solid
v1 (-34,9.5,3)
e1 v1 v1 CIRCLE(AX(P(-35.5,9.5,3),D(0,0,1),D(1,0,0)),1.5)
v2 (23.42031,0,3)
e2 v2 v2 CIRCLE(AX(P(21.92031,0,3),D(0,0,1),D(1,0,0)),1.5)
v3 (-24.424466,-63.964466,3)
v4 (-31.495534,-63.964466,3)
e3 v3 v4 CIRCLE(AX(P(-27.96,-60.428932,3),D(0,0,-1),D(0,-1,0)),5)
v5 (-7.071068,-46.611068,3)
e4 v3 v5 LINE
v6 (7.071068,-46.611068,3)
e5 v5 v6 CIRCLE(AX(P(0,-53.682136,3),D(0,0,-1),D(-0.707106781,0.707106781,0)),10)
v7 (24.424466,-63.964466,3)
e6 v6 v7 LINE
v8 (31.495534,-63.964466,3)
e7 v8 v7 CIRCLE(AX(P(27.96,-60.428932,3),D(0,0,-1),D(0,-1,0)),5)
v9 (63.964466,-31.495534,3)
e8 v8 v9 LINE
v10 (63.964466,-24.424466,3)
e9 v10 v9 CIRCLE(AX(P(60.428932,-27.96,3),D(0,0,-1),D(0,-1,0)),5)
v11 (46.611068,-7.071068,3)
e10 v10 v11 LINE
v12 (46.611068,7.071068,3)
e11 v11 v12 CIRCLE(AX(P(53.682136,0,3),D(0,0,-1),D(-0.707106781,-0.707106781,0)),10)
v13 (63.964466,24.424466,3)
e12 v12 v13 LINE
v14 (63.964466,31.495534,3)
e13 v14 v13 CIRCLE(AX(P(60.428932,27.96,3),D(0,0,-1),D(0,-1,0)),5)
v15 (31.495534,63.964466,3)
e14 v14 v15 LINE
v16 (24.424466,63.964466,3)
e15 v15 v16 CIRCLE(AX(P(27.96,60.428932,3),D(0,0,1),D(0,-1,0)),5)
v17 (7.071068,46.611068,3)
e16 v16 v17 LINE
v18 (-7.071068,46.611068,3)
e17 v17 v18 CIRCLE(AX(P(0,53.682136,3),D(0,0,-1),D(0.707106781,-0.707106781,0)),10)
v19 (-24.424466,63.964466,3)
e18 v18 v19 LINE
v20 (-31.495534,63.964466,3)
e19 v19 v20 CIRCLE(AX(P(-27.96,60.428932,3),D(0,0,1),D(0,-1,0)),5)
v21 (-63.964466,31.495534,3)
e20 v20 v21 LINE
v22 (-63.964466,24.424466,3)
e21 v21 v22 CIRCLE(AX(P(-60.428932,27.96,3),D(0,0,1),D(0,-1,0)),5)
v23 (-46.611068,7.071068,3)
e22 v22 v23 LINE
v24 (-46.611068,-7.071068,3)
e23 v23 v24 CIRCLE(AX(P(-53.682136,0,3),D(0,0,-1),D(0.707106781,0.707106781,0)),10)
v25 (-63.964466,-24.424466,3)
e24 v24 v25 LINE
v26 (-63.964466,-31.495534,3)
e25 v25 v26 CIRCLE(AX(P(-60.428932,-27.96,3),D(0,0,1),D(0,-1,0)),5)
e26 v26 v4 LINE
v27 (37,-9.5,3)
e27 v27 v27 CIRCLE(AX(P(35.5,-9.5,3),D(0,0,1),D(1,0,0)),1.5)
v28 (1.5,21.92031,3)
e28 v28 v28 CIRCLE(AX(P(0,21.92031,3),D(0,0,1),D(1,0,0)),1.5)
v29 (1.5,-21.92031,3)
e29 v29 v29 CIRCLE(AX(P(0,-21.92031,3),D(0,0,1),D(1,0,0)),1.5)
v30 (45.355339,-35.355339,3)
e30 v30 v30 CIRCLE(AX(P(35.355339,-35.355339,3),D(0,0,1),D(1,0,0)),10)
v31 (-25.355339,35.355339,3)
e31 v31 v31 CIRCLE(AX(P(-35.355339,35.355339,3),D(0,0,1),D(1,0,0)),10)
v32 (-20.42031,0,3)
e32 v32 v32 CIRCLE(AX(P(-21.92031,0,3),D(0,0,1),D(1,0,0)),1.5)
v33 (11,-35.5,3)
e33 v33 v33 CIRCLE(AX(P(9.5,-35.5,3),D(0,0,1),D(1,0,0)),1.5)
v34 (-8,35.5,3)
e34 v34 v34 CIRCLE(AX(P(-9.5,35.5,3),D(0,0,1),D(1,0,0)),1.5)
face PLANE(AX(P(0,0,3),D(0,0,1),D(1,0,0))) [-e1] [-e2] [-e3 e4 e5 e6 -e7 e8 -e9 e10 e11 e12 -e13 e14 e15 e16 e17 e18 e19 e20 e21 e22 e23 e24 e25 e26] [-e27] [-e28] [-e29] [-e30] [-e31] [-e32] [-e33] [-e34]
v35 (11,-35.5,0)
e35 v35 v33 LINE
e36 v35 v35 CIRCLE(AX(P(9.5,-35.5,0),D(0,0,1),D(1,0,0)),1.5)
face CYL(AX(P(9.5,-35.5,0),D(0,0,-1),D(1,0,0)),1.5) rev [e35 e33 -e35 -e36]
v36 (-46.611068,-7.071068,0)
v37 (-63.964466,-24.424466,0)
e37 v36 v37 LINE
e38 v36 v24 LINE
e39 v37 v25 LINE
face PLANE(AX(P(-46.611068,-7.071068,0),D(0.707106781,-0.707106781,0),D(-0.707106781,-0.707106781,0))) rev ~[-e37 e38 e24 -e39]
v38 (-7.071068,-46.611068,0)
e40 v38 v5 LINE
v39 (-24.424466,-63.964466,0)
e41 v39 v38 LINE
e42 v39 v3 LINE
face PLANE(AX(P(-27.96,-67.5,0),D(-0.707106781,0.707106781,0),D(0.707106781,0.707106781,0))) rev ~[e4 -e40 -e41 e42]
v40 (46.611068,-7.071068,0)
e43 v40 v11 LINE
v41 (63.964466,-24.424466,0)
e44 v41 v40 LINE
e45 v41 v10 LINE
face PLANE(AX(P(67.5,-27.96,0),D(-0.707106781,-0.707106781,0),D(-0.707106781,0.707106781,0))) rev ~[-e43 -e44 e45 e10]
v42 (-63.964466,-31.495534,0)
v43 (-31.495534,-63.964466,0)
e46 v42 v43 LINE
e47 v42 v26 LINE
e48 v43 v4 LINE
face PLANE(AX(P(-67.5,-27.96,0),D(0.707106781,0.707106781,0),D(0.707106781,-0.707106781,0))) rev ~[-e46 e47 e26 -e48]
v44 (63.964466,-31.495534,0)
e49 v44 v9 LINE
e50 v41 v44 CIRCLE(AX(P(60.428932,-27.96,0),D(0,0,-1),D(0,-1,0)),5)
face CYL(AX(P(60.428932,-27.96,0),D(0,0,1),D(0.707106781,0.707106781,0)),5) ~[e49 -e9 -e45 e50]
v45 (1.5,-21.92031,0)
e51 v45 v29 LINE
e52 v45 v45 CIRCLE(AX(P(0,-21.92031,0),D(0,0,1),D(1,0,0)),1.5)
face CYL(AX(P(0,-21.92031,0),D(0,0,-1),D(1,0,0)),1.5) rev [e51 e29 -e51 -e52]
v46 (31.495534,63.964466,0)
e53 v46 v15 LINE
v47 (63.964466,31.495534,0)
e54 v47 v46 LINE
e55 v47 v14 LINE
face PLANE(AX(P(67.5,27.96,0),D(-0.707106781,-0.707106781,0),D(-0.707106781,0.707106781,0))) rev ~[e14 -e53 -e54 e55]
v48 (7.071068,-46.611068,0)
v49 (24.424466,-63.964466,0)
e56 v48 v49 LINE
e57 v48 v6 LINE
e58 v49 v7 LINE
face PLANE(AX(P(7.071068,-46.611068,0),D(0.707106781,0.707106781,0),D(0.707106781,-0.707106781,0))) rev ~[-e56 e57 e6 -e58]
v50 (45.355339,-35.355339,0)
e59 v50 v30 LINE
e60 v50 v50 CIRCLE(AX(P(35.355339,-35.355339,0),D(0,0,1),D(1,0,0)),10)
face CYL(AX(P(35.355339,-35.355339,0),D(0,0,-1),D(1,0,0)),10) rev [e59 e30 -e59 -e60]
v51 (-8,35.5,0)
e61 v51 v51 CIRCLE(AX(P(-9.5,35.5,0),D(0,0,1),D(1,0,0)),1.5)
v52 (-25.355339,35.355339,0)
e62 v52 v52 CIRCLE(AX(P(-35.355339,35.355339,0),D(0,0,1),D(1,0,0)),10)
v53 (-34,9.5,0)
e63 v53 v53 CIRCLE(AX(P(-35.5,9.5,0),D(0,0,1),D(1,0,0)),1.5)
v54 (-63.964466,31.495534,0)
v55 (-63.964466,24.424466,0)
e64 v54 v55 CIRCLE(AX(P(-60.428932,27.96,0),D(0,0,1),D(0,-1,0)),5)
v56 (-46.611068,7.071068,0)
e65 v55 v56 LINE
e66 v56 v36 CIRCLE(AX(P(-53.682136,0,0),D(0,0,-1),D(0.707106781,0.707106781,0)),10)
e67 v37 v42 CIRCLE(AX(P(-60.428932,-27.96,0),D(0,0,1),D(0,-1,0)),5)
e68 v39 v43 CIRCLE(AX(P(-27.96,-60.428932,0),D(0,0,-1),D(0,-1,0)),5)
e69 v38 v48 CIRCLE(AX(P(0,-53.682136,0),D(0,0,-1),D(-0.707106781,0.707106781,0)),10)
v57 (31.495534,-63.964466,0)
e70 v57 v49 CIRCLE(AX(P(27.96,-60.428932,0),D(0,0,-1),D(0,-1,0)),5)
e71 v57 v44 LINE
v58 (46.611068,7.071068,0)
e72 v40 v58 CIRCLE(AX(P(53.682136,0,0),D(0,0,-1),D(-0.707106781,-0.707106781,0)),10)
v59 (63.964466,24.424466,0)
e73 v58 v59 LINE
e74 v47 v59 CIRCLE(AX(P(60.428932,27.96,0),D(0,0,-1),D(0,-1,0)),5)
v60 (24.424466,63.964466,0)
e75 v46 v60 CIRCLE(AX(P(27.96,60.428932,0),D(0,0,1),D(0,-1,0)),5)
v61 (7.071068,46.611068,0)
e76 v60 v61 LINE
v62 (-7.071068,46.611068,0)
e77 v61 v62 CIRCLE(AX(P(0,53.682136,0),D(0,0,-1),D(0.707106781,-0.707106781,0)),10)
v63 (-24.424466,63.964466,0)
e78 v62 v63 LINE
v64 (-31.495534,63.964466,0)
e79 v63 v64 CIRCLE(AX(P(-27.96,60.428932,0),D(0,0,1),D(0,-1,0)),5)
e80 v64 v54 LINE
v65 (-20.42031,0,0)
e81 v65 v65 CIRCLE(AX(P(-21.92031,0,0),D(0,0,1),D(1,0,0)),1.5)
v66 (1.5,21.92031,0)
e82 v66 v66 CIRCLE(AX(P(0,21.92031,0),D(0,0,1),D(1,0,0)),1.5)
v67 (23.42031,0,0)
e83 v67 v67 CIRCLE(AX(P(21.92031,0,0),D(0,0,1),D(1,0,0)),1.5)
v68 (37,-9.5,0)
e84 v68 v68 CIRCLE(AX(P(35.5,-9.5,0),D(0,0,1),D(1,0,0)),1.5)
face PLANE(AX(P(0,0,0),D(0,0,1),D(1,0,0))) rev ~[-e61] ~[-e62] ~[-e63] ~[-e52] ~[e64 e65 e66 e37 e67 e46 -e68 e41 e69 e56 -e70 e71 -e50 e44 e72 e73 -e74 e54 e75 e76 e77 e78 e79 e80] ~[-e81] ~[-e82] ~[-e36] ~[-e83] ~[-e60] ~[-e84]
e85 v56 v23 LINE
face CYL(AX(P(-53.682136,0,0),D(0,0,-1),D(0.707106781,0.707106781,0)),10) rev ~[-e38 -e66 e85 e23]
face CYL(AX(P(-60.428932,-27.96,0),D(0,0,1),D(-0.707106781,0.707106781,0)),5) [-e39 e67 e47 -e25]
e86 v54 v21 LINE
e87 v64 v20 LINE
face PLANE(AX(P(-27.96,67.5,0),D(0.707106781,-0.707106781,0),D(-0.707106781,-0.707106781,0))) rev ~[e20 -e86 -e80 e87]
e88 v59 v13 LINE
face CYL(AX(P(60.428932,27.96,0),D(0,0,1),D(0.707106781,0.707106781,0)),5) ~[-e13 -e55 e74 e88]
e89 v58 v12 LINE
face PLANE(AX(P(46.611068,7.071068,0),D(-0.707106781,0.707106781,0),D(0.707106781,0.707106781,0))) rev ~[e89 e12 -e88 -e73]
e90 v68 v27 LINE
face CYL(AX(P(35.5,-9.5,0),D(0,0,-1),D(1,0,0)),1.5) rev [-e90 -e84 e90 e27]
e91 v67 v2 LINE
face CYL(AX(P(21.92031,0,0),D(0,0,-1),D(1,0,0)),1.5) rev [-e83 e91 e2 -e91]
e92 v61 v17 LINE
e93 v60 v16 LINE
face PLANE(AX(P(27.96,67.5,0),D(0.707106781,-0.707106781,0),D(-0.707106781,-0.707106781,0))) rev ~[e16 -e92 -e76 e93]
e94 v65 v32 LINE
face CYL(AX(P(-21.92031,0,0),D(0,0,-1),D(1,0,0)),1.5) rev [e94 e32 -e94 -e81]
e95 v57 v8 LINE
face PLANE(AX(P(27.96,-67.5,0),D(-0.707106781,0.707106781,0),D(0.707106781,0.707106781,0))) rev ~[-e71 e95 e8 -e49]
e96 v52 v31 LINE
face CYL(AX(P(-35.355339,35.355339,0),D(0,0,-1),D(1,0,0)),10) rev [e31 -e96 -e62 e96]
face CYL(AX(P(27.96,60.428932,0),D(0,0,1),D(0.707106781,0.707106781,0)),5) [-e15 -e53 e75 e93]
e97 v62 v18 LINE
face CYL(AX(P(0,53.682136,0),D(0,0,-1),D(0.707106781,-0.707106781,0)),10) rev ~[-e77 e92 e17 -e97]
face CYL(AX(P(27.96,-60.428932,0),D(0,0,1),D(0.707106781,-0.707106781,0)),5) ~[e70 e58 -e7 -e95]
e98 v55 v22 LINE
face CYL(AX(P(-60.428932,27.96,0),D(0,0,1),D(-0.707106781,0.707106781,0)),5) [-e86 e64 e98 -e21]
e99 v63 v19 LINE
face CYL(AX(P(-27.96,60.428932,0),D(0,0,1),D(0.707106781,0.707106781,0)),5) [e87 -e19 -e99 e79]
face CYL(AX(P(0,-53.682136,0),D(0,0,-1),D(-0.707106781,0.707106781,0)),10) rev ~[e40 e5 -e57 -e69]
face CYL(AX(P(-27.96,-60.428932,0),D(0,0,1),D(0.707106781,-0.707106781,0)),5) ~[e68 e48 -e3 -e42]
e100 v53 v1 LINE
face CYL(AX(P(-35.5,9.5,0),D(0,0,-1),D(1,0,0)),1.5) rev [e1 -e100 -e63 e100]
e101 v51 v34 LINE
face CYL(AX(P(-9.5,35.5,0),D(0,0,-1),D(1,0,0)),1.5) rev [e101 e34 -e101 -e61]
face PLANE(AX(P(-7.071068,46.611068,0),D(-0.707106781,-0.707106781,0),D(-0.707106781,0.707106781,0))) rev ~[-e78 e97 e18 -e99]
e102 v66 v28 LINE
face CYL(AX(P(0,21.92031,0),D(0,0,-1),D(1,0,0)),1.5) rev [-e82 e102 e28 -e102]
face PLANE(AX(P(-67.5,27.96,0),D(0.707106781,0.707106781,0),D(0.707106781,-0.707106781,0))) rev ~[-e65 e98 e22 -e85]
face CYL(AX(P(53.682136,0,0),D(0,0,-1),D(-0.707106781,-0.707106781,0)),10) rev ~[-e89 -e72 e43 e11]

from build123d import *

# Parameters (mm, degrees)
F0_R     = 1.5
F0_R_2   = 10
F1_DEPTH = 3
F2_R     = 5


with BuildPart() as f1:
    # F0 (on Top) → F1 (new body)
    with BuildSketch(Plane.XY):
        with BuildLine():
            Line((67.5, 27.96), (27.96, 67.5))
            Line((27.96, 67.5), (7.0710678119, 46.6110678119))
            ThreePointArc((7.0710678119, 46.6110678119), (0, 43.6821356237), (-7.0710678119, 46.6110678119))
            Line((-7.0710678119, 46.6110678119), (-27.96, 67.5))
            Line((-27.96, 67.5), (-67.5, 27.96))
            Line((-67.5, 27.96), (-46.6110678119, 7.0710678119))
            ThreePointArc((-46.6110678119, 7.0710678119), (-43.6821356237, 0), (-46.6110678119, -7.0710678119))
            Line((-46.6110678119, -7.0710678119), (-67.5, -27.96))
            Line((-67.5, -27.96), (-27.96, -67.5))
            Line((-27.96, -67.5), (-7.0710678119, -46.6110678119))
            ThreePointArc((-7.0710678119, -46.6110678119), (0, -43.6821356237), (7.0710678119, -46.6110678119))
            Line((7.0710678119, -46.6110678119), (27.96, -67.5))
            Line((27.96, -67.5), (67.5, -27.96))
            Line((67.5, -27.96), (46.6110678119, -7.0710678119))
            ThreePointArc((46.6110678119, -7.0710678119), (43.6821356237, 0), (46.6110678119, 7.0710678119))
            Line((46.6110678119, 7.0710678119), (67.5, 27.96))
        make_face()
        with Locations((9.5, -35.5)):
            Circle(F0_R, mode=Mode.SUBTRACT)
        with Locations((35.3553390593, -35.3553390593)):
            Circle(F0_R_2, mode=Mode.SUBTRACT)
        with Locations((0, -21.9203102168)):
            Circle(F0_R, mode=Mode.SUBTRACT)
        with Locations((35.5, -9.5)):
            Circle(F0_R, mode=Mode.SUBTRACT)
        with Locations((-35.5, 9.5)):
            Circle(F0_R, mode=Mode.SUBTRACT)
        with Locations((-21.9203102168, 0)):
            Circle(F0_R, mode=Mode.SUBTRACT)
        with Locations((-35.3553390593, 35.3553390593)):
            Circle(F0_R_2, mode=Mode.SUBTRACT)
        with Locations((-9.5, 35.5)):
            Circle(F0_R, mode=Mode.SUBTRACT)
        with Locations((21.9203102168, 0)):
            Circle(F0_R, mode=Mode.SUBTRACT)
        with Locations((0, 21.9203102168)):
            Circle(F0_R, mode=Mode.SUBTRACT)
    extrude(amount=F1_DEPTH)

    # F2
    f2_edges = [f1.edges().sort_by_distance(p)[0] for p in [
        (27.96, -67.5, 1.5),
        (67.5, -27.96, 1.5),
        (67.5, 27.96, 1.5),
        (27.96, 67.5, 1.5),
        (-27.96, 67.5, 1.5),
        (-67.5, 27.96, 1.5),
        (-67.5, -27.96, 1.5),
        (-27.96, -67.5, 1.5),
    ]]
    fillet(f2_edges, radius=F2_R)


solid = f1.part
